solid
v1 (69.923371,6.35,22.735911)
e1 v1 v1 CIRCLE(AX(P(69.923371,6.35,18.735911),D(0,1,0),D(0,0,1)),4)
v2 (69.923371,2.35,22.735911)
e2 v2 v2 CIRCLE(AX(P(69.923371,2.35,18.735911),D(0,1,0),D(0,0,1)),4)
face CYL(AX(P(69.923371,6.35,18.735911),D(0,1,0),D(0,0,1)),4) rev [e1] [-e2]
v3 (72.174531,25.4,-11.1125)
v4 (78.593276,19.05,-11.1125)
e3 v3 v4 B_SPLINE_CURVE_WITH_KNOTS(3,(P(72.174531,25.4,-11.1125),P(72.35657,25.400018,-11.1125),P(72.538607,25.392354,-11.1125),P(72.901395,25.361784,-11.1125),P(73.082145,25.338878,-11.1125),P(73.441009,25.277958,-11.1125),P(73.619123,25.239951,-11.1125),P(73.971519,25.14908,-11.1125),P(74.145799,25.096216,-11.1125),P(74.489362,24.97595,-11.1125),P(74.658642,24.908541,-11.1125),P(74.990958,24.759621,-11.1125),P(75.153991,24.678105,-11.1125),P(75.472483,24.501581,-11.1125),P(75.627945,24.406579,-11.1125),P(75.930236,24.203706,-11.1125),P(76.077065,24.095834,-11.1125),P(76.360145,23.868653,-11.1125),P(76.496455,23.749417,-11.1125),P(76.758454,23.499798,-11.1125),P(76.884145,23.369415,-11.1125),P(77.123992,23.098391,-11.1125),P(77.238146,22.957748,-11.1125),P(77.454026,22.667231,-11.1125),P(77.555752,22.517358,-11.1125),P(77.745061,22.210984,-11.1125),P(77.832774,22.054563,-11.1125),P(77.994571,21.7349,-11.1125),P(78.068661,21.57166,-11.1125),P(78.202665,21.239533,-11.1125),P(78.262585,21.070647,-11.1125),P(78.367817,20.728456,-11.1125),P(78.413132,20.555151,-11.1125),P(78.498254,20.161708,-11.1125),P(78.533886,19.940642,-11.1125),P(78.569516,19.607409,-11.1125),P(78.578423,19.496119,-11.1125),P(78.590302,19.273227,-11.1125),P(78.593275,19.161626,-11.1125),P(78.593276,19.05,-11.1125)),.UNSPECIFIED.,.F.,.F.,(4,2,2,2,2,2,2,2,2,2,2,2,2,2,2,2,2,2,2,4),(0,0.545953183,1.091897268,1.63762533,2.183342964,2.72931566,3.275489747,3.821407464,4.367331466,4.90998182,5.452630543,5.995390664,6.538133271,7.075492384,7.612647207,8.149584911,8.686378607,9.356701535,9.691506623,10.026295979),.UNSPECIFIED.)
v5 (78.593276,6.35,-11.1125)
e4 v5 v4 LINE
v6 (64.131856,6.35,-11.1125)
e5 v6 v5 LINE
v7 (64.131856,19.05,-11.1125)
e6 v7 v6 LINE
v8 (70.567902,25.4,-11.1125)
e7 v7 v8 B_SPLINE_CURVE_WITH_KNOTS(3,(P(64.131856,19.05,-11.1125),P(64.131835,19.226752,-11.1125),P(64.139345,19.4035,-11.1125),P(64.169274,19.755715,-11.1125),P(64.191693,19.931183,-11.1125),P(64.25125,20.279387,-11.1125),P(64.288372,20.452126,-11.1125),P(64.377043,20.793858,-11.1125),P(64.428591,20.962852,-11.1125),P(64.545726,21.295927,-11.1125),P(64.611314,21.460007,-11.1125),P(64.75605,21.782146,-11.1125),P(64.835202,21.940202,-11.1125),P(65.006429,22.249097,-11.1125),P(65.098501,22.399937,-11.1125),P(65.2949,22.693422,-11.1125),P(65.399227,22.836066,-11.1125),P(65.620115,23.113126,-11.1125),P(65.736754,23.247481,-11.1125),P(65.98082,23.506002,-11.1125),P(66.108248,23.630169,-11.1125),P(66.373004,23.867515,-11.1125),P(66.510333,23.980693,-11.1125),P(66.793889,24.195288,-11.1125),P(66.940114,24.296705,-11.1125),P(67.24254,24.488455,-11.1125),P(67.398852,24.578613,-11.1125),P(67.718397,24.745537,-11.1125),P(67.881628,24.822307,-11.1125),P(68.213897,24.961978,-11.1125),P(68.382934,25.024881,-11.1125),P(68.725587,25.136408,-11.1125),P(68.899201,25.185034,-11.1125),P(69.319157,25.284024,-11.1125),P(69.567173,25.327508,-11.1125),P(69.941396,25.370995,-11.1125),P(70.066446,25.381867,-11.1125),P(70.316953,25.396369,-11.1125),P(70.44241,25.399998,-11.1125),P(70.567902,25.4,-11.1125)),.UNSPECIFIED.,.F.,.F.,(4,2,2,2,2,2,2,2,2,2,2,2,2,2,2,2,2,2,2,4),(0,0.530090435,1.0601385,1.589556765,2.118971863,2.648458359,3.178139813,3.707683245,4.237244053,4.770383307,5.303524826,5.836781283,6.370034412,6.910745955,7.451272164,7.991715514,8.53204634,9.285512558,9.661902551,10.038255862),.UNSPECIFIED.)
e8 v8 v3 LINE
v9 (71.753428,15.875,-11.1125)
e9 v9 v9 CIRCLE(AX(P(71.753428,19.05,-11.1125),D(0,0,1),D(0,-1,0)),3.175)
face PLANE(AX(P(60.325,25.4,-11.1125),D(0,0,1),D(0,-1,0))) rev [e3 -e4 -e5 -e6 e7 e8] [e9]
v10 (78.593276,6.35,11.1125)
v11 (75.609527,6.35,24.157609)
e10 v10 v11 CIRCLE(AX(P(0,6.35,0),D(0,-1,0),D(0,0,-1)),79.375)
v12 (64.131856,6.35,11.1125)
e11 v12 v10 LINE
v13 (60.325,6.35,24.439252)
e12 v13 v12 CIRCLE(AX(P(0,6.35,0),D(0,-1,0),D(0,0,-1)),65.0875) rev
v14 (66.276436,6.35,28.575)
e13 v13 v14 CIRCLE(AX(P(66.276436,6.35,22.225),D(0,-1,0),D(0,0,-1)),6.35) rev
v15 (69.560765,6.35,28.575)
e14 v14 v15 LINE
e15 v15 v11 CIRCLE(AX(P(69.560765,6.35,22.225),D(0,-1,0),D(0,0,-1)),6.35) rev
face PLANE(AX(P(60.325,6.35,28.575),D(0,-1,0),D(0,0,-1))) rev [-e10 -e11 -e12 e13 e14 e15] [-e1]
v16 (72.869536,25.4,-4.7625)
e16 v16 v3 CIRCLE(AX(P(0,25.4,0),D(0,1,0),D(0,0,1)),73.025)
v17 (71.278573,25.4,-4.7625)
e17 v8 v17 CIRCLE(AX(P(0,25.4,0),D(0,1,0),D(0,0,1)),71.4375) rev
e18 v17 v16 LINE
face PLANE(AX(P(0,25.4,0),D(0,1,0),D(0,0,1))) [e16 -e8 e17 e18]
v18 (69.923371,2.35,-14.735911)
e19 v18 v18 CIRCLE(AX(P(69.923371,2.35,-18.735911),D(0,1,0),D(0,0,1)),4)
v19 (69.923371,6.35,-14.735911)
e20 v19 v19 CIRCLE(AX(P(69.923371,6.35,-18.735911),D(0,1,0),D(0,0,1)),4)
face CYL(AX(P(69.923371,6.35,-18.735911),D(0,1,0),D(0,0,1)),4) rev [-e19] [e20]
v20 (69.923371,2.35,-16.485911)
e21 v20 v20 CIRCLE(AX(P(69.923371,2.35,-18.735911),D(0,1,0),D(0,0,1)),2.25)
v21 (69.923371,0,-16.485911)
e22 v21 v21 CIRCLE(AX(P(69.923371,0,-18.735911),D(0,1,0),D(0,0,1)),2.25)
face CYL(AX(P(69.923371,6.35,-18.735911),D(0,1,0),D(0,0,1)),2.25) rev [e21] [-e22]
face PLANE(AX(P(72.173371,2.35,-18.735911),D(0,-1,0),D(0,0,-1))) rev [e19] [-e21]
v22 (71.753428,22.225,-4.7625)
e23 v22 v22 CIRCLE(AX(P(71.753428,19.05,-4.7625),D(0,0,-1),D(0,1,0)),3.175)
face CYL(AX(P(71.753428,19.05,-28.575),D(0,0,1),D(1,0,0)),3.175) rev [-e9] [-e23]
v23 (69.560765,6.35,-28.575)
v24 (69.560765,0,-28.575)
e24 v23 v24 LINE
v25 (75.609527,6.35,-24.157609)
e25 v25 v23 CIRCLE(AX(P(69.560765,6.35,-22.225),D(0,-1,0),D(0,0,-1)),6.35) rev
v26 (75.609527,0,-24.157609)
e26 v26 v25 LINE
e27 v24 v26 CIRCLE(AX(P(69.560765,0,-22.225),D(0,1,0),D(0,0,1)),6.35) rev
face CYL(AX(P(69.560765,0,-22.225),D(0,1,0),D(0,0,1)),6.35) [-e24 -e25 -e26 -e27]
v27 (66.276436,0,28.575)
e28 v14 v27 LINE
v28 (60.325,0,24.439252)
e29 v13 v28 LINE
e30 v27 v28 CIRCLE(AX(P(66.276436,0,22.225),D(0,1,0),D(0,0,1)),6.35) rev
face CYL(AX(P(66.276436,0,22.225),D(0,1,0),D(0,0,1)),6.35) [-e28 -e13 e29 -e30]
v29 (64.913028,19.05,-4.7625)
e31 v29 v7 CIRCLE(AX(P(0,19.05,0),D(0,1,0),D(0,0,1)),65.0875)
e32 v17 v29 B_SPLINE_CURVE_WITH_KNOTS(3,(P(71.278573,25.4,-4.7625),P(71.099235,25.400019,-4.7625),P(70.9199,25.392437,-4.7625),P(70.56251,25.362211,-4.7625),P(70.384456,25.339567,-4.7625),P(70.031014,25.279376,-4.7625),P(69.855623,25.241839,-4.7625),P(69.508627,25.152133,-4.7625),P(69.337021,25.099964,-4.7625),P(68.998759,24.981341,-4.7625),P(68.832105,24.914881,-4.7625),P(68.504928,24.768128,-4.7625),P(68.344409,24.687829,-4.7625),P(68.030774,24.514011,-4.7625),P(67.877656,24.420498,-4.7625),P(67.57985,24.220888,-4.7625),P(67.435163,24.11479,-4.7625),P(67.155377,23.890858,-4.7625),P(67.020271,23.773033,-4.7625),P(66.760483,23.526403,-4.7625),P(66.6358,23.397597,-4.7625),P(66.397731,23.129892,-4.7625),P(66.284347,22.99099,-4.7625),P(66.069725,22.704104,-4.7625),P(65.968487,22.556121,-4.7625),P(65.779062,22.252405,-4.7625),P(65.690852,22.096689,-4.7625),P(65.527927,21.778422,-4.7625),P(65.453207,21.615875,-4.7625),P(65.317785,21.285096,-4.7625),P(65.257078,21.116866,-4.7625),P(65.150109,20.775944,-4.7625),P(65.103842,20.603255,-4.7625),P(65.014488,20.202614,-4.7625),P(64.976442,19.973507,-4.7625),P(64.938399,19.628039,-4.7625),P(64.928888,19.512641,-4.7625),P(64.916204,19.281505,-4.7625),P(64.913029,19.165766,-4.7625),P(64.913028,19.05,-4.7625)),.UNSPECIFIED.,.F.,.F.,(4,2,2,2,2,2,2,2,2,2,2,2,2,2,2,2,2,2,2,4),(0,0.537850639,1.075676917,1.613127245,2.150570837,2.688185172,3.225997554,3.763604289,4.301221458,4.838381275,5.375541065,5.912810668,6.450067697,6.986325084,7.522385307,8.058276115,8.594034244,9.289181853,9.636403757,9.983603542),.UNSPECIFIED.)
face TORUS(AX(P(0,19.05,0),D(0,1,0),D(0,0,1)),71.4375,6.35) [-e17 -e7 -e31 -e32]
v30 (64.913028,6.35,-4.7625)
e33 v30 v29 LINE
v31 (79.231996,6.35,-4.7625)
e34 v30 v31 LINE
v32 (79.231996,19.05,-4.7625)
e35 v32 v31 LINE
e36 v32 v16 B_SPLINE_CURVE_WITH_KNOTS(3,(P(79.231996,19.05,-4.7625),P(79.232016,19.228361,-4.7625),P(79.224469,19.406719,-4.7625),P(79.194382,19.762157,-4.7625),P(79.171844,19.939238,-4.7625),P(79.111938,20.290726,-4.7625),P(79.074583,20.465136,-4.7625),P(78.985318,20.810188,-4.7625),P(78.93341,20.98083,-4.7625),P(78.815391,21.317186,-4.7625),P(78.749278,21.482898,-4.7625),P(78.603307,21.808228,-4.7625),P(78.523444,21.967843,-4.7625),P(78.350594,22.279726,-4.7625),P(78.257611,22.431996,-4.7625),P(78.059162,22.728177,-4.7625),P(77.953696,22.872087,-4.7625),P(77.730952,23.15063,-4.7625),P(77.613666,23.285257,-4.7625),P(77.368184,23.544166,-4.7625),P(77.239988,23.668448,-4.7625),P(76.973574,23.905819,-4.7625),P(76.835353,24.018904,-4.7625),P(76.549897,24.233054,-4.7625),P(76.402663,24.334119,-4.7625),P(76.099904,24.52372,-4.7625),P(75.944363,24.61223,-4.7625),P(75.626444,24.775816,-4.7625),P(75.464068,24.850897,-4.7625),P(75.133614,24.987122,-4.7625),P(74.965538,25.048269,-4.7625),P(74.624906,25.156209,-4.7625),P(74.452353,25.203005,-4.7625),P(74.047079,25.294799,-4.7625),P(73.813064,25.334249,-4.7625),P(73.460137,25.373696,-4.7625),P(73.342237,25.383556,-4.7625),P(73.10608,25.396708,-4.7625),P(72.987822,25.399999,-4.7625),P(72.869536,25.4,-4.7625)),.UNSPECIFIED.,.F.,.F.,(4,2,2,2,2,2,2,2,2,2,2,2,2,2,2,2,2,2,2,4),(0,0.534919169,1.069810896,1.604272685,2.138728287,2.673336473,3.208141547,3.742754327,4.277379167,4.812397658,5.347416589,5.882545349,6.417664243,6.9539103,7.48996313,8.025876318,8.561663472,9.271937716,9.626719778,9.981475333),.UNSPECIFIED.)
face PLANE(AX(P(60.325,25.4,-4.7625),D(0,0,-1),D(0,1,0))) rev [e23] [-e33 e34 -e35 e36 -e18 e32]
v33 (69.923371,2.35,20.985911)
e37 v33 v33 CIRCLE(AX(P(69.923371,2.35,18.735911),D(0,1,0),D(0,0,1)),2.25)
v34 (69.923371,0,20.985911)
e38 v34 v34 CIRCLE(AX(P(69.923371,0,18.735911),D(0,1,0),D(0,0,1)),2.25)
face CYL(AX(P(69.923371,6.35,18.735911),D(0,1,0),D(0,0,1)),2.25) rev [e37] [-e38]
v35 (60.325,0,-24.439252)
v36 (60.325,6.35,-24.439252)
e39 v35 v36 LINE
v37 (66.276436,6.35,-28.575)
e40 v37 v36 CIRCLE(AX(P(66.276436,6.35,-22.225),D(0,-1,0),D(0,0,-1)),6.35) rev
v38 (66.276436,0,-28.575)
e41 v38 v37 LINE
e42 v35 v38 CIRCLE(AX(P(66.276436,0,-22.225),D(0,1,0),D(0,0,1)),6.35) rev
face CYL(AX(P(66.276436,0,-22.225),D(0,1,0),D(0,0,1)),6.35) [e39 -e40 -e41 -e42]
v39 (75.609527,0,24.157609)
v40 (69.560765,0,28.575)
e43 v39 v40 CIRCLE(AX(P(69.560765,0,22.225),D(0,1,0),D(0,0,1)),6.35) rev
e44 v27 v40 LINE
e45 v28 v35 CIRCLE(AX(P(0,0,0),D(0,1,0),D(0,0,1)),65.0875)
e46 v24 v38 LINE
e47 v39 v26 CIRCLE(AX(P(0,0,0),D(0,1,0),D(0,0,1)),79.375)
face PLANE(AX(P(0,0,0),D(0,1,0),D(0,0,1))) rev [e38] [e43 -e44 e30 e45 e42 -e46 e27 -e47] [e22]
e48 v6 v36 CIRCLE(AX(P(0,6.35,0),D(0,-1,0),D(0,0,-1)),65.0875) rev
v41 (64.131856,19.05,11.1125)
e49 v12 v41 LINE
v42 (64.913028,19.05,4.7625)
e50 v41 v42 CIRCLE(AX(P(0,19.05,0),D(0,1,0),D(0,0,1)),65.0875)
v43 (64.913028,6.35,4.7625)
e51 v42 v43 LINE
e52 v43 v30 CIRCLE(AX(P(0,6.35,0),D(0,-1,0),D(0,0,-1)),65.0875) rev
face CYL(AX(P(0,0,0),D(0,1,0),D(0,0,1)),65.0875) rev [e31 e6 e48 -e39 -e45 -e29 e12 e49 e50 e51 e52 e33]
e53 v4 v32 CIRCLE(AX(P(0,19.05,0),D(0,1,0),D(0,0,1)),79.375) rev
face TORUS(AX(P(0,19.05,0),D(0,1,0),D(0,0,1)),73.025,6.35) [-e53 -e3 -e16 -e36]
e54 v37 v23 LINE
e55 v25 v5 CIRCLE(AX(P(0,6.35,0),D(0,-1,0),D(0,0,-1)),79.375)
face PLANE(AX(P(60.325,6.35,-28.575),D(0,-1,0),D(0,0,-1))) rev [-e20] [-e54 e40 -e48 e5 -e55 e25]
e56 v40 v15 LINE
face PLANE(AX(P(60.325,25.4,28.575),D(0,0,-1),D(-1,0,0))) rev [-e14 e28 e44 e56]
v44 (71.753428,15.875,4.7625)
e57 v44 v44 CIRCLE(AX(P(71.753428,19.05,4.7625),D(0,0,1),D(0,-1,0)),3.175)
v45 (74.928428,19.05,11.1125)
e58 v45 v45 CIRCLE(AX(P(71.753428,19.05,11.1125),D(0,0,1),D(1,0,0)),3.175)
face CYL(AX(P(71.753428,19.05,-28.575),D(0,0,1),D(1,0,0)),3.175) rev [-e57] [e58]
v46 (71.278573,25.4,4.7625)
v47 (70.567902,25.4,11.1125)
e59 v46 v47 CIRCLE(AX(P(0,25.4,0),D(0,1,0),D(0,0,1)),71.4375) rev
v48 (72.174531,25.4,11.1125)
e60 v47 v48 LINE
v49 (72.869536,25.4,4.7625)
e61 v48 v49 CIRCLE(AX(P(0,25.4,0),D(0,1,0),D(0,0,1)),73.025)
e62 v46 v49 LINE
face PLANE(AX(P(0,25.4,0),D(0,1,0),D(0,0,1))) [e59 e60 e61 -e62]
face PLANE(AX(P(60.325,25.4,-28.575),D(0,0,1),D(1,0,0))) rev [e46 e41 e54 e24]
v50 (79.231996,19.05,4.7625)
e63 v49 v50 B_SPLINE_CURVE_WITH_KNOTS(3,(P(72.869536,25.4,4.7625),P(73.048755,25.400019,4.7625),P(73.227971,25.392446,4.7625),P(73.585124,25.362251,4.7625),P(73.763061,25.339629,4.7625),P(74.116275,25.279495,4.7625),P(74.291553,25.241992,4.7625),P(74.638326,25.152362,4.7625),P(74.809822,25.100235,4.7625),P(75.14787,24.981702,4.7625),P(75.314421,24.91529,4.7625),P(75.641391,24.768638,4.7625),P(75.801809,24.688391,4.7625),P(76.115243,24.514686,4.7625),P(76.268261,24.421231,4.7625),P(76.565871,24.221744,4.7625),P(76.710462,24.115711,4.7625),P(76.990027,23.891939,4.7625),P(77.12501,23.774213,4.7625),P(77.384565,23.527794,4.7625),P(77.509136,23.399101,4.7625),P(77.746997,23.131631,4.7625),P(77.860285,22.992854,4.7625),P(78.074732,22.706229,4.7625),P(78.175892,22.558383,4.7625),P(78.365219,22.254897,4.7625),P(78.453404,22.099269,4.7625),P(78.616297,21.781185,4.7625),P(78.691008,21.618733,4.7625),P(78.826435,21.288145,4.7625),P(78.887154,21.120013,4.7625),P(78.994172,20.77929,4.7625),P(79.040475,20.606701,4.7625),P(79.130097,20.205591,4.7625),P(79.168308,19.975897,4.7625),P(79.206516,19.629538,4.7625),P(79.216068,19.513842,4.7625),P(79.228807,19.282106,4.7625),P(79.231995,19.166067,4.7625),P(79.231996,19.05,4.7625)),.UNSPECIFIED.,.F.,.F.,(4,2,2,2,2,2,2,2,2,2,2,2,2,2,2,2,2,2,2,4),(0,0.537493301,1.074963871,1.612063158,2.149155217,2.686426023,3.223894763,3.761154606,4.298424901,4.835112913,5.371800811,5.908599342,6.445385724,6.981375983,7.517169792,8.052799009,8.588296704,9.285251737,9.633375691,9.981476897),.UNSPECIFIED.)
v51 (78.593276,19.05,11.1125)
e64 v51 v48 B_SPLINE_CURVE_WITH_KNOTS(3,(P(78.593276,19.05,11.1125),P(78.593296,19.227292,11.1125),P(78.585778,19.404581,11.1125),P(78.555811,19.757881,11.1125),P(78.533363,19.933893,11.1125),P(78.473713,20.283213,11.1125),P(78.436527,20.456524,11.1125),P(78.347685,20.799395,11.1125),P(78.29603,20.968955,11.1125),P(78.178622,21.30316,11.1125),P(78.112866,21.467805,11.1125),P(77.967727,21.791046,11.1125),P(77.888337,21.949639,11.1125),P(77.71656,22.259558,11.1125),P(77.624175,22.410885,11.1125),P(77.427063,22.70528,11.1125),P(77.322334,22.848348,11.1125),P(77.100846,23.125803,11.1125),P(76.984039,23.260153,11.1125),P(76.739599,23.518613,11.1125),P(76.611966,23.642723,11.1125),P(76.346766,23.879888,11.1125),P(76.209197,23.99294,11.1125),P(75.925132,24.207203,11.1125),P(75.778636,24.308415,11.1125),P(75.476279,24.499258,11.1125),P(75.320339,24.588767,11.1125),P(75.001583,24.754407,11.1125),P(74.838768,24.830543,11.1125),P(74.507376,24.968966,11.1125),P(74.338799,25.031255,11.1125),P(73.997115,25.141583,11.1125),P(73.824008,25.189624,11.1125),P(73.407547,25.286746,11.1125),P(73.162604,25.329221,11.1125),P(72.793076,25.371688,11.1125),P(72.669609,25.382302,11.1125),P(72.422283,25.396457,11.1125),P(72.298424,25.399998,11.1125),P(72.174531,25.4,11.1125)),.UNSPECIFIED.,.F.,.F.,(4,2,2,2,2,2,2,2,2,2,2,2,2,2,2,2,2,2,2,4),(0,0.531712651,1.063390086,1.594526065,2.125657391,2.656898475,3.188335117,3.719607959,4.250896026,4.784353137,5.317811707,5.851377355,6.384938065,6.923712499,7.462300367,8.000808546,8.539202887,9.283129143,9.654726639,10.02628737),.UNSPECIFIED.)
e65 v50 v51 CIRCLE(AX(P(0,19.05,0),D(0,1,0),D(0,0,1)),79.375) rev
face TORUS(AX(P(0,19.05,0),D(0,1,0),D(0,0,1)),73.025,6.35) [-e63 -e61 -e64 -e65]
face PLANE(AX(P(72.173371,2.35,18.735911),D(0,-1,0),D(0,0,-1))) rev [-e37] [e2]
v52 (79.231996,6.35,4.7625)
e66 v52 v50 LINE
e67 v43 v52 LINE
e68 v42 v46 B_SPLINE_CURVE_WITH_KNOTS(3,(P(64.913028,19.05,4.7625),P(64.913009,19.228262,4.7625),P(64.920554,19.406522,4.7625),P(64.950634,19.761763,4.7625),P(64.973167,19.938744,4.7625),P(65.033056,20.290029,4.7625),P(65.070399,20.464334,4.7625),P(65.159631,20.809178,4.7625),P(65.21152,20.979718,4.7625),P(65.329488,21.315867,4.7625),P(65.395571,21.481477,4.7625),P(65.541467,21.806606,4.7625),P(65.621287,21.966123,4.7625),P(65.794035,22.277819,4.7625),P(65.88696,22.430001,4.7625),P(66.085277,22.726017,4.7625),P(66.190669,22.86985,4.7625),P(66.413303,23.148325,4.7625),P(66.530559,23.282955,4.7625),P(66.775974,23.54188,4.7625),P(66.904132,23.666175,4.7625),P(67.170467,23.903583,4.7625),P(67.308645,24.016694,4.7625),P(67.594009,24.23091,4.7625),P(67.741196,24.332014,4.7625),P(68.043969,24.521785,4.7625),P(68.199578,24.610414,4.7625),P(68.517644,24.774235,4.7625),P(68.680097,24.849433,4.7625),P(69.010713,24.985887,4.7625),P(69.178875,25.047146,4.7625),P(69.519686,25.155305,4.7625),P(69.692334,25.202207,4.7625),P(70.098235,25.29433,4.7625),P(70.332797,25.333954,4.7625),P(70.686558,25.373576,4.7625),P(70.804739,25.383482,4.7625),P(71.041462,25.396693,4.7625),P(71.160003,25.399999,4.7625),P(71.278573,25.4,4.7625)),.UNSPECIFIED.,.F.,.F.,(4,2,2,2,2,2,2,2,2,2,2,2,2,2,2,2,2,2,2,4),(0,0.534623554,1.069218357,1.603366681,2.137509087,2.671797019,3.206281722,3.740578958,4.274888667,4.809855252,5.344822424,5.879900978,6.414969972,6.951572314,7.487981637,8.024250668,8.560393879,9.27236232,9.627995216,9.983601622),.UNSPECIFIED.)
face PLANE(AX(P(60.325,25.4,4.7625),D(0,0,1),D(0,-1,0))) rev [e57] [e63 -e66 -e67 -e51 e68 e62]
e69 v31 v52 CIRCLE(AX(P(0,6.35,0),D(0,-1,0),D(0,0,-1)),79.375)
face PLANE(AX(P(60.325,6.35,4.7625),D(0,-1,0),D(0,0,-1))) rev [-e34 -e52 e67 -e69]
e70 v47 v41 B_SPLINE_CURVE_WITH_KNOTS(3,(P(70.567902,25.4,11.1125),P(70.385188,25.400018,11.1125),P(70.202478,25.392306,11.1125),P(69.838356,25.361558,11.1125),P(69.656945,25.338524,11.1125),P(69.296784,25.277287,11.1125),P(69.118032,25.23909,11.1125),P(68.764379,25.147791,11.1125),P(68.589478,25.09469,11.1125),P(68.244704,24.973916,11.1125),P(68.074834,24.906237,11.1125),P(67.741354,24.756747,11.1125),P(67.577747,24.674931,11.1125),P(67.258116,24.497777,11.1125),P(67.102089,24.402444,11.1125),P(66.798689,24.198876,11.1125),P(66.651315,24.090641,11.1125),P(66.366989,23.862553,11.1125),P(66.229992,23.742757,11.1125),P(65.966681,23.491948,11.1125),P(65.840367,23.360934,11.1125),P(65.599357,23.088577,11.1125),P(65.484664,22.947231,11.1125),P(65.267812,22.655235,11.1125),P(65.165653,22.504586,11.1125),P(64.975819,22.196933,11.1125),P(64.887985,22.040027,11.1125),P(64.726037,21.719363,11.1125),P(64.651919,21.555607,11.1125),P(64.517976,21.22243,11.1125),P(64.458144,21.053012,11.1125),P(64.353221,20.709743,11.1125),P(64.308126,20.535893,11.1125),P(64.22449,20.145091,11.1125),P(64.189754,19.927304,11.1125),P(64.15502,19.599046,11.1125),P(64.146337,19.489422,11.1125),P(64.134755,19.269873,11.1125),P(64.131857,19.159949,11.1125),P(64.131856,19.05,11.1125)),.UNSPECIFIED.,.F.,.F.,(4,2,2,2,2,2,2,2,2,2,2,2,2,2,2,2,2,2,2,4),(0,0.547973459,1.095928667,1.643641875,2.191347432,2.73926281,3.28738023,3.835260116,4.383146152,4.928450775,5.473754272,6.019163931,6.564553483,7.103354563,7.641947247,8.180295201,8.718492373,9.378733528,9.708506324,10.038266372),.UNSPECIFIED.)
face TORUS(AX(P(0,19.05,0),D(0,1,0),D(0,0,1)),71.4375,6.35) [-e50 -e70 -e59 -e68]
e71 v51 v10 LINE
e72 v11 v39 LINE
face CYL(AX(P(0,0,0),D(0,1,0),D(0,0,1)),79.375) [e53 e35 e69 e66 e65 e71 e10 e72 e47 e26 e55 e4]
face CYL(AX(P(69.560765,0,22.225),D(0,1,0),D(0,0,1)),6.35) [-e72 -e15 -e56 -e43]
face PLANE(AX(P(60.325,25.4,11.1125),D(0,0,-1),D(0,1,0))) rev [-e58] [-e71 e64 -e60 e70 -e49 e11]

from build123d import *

# Parameters (mm, degrees)
SKETCH1_W                      = 19.05
SKETCH1_H                      = 57.15
BOSS_EXTRUDE1_DEPTH            = 25.4
SKETCH8_R                      = 65.0875
CUT_EXTRUDE2_DEPTH             = 89.102674477
SKETCH2_W                      = 17.4625
SKETCH2_H                      = 19.05
SKETCH2_W_2                    = 9.525
CUT_EXTRUDE1_DEPTH             = 43.715256349
CBORE_FOR_M4_SHCS1_D           = 4.5
CBORE_FOR_M4_SHCS1_CBORE_D     = 8
CBORE_FOR_M4_SHCS1_CBORE_DEPTH = 4
SKETCH9_R                      = 3.175
CUT_EXTRUDE3_DEPTH             = 93.307357677
CUT_EXTRUDE4_START             = -6.35
CUT_EXTRUDE4_DEPTH             = 25.4
FILLET1_R                      = 6.35
FILLET2_R                      = 6.35


# Read off the part's stored shape, not the designer's step: Cut-Extrude4
with BuildPart() as part:
    # Sketch1 → Boss-Extrude1 (new body)
    with BuildSketch(Plane(origin=(0, 0, 0), x_dir=(1, 0, 0), z_dir=(0, 1, 0))):
        with Locations((69.85, 0)):
            Rectangle(SKETCH1_W, SKETCH1_H)
    extrude(amount=BOSS_EXTRUDE1_DEPTH)

    # Sketch8 → Cut-Extrude2 (cut, through all)
    with BuildSketch(Plane(origin=(0, 25.4, 0), x_dir=(1, 0, 0), z_dir=(0, 1, 0))):
        Circle(SKETCH8_R)
    extrude(amount=-CUT_EXTRUDE2_DEPTH, mode=Mode.SUBTRACT)

    # Sketch2 → Cut-Extrude1 (cut, through all)
    with BuildSketch(Plane(origin=(79.375, 0, 0), x_dir=(0, 0, -1), z_dir=(1, 0, 0))):
        with Locations((-19.84375, 15.875)):
            Rectangle(SKETCH2_W, SKETCH2_H)
        with Locations((0, 15.875)):
            Rectangle(SKETCH2_W_2, SKETCH2_H)
        with Locations((19.84375, 15.875)):
            Rectangle(SKETCH2_W, SKETCH2_H)
    extrude(amount=-CUT_EXTRUDE1_DEPTH, mode=Mode.SUBTRACT)

    # CBORE for M4 SHCS1 (through all)
    with Locations(Plane(origin=(0, 6.35, 0), x_dir=(1, 0, 0), z_dir=(0, 1, 0))):
        with Locations((69.923370565, -18.735910675), (69.923370565, 18.735910675)):
            CounterBoreHole(CBORE_FOR_M4_SHCS1_D / 2, CBORE_FOR_M4_SHCS1_CBORE_D / 2, CBORE_FOR_M4_SHCS1_CBORE_DEPTH)

    # Sketch9 → Cut-Extrude3 (cut, through all)
    with BuildSketch(Plane.XY.offset(11.1125)):
        with Locations(Location((71.753428179, 19.05, 0), (0, 0, 90))):
            Circle(SKETCH9_R)
    extrude(amount=-CUT_EXTRUDE3_DEPTH, mode=Mode.SUBTRACT)

    # Cut-Extrude4 outline → Cut-Extrude4 (cut)
    with BuildSketch(Plane(origin=(0, 6.35, 0), x_dir=(1, 0, 0), z_dir=(0, 1, 0)).offset(CUT_EXTRUDE4_START)):
        with BuildLine():
            ThreePointArc((74.053089065, 28.575), (78.033180665, 14.533180665), (79.375, 0))
            Line((79.375, 0), (79.375, 28.575))
            Line((79.375, 28.575), (74.053089065, 28.575))
        make_face()
        with BuildLine():
            ThreePointArc((79.375, 0), (78.033180665, -14.533180665), (74.053089065, -28.575))
            Line((74.053089065, -28.575), (79.375, -28.575))
            Line((79.375, -28.575), (79.375, 0))
        make_face()
    extrude(amount=CUT_EXTRUDE4_DEPTH, mode=Mode.SUBTRACT)

    # Fillet1
    fillet1_edges = [part.edges().sort_by_distance(p)[0] for p in [
        (78.976482118, 25.4, 7.943922032),
        (78.976482118, 25.4, -7.943922032),
        (64.600512324, 25.4, 7.947104106),
        (64.600512324, 25.4, -7.947104106),
    ]]
    fillet(fillet1_edges, radius=FILLET1_R)

    # Fillet2
    # the kernel refuses this fillet: 6.35 mm, written as the material it takes off along each edge
    with BuildSketch(Plane(origin=(60.325, -14.878589634, -28.575), x_dir=(1, 0, 0), z_dir=(0, 1, 0))) as fillet2_piece_1:
        with BuildLine():
            CenterArc((5.951435854, -6.35), FILLET2_R, 90, 69.592112093)
            Line((0, -4.135748145), (-0.119028717, -4.091463108))
            ThreePointArc((-0.119028717, -4.091463108), (-0.127, -2.067874072), (-0.127, 0))
            Line((-0.127, 0), (0, 0.127))
            Line((0, 0.127), (5.951435854, 0.127))
            Line((5.951435854, 0.127), (5.951435854, 0))
        make_face()
    extrude(amount=36.107179269, mode=Mode.SUBTRACT)
    with BuildSketch(Plane(origin=(74.053089065, -11.708929515, -28.575), x_dir=(0.33231857215714583, 0, 0.9431671997050343), z_dir=(0, 1, 0))) as fillet2_piece_2:
        with BuildLine():
            CenterArc((4.496228934, -6.347235827), FILLET2_R, 88.309367925, 72.281068131)
            Line((-1.492882784, -4.237012894), (-1.612665019, -4.194808436))
            Line((-1.612665019, -4.194808436), (-0.119782234, 0.042204459))
            Line((-0.119782234, 0.042204459), (-0.003746857, 0.126944717))
            ThreePointArc((-0.003746857, 0.126944717), (2.341785903, 0.161552158), (4.687318663, 0.126944717))
            Line((4.687318663, 0.126944717), (4.683571806, 0))
        make_face()
    extrude(amount=29.76785903, mode=Mode.SUBTRACT)
    with BuildSketch(Plane(origin=(60.325, -14.878589634, 28.575), x_dir=(1, 0, 0), z_dir=(0, 1, 0))) as fillet2_piece_3:
        with BuildLine():
            CenterArc((5.951435854, 6.35), FILLET2_R, 200.407887907, 69.592112093)
            Line((0, 4.135748145), (-0.119028717, 4.091463108))
            ThreePointArc((-0.119028717, 4.091463108), (-0.127, 2.067874072), (-0.127, 0))
            Line((-0.127, 0), (0, -0.127))
            Line((0, -0.127), (5.951435854, -0.127))
            Line((5.951435854, -0.127), (5.951435854, 0))
        make_face()
    extrude(amount=36.107179269, mode=Mode.SUBTRACT)
    with BuildSketch(Plane(origin=(74.053089065, -11.708929515, 28.575), x_dir=(0.3323185721571436, 0, -0.943167199705035), z_dir=(0, 1, 0))) as fillet2_piece_4:
        with BuildLine():
            CenterArc((4.496228934, 6.347235827), FILLET2_R, 199.409563944, 72.281068131)
            Line((-1.492882784, 4.237012894), (-1.612665019, 4.194808436))
            Line((-1.612665019, 4.194808436), (-0.119782234, -0.042204459))
            Line((-0.119782234, -0.042204459), (-0.003746857, -0.126944717))
            ThreePointArc((-0.003746857, -0.126944717), (2.341785903, -0.161552158), (4.687318663, -0.126944717))
            Line((4.687318663, -0.126944717), (4.683571806, 0))
        make_face()
    extrude(amount=29.76785903, mode=Mode.SUBTRACT)


solid = part.part
